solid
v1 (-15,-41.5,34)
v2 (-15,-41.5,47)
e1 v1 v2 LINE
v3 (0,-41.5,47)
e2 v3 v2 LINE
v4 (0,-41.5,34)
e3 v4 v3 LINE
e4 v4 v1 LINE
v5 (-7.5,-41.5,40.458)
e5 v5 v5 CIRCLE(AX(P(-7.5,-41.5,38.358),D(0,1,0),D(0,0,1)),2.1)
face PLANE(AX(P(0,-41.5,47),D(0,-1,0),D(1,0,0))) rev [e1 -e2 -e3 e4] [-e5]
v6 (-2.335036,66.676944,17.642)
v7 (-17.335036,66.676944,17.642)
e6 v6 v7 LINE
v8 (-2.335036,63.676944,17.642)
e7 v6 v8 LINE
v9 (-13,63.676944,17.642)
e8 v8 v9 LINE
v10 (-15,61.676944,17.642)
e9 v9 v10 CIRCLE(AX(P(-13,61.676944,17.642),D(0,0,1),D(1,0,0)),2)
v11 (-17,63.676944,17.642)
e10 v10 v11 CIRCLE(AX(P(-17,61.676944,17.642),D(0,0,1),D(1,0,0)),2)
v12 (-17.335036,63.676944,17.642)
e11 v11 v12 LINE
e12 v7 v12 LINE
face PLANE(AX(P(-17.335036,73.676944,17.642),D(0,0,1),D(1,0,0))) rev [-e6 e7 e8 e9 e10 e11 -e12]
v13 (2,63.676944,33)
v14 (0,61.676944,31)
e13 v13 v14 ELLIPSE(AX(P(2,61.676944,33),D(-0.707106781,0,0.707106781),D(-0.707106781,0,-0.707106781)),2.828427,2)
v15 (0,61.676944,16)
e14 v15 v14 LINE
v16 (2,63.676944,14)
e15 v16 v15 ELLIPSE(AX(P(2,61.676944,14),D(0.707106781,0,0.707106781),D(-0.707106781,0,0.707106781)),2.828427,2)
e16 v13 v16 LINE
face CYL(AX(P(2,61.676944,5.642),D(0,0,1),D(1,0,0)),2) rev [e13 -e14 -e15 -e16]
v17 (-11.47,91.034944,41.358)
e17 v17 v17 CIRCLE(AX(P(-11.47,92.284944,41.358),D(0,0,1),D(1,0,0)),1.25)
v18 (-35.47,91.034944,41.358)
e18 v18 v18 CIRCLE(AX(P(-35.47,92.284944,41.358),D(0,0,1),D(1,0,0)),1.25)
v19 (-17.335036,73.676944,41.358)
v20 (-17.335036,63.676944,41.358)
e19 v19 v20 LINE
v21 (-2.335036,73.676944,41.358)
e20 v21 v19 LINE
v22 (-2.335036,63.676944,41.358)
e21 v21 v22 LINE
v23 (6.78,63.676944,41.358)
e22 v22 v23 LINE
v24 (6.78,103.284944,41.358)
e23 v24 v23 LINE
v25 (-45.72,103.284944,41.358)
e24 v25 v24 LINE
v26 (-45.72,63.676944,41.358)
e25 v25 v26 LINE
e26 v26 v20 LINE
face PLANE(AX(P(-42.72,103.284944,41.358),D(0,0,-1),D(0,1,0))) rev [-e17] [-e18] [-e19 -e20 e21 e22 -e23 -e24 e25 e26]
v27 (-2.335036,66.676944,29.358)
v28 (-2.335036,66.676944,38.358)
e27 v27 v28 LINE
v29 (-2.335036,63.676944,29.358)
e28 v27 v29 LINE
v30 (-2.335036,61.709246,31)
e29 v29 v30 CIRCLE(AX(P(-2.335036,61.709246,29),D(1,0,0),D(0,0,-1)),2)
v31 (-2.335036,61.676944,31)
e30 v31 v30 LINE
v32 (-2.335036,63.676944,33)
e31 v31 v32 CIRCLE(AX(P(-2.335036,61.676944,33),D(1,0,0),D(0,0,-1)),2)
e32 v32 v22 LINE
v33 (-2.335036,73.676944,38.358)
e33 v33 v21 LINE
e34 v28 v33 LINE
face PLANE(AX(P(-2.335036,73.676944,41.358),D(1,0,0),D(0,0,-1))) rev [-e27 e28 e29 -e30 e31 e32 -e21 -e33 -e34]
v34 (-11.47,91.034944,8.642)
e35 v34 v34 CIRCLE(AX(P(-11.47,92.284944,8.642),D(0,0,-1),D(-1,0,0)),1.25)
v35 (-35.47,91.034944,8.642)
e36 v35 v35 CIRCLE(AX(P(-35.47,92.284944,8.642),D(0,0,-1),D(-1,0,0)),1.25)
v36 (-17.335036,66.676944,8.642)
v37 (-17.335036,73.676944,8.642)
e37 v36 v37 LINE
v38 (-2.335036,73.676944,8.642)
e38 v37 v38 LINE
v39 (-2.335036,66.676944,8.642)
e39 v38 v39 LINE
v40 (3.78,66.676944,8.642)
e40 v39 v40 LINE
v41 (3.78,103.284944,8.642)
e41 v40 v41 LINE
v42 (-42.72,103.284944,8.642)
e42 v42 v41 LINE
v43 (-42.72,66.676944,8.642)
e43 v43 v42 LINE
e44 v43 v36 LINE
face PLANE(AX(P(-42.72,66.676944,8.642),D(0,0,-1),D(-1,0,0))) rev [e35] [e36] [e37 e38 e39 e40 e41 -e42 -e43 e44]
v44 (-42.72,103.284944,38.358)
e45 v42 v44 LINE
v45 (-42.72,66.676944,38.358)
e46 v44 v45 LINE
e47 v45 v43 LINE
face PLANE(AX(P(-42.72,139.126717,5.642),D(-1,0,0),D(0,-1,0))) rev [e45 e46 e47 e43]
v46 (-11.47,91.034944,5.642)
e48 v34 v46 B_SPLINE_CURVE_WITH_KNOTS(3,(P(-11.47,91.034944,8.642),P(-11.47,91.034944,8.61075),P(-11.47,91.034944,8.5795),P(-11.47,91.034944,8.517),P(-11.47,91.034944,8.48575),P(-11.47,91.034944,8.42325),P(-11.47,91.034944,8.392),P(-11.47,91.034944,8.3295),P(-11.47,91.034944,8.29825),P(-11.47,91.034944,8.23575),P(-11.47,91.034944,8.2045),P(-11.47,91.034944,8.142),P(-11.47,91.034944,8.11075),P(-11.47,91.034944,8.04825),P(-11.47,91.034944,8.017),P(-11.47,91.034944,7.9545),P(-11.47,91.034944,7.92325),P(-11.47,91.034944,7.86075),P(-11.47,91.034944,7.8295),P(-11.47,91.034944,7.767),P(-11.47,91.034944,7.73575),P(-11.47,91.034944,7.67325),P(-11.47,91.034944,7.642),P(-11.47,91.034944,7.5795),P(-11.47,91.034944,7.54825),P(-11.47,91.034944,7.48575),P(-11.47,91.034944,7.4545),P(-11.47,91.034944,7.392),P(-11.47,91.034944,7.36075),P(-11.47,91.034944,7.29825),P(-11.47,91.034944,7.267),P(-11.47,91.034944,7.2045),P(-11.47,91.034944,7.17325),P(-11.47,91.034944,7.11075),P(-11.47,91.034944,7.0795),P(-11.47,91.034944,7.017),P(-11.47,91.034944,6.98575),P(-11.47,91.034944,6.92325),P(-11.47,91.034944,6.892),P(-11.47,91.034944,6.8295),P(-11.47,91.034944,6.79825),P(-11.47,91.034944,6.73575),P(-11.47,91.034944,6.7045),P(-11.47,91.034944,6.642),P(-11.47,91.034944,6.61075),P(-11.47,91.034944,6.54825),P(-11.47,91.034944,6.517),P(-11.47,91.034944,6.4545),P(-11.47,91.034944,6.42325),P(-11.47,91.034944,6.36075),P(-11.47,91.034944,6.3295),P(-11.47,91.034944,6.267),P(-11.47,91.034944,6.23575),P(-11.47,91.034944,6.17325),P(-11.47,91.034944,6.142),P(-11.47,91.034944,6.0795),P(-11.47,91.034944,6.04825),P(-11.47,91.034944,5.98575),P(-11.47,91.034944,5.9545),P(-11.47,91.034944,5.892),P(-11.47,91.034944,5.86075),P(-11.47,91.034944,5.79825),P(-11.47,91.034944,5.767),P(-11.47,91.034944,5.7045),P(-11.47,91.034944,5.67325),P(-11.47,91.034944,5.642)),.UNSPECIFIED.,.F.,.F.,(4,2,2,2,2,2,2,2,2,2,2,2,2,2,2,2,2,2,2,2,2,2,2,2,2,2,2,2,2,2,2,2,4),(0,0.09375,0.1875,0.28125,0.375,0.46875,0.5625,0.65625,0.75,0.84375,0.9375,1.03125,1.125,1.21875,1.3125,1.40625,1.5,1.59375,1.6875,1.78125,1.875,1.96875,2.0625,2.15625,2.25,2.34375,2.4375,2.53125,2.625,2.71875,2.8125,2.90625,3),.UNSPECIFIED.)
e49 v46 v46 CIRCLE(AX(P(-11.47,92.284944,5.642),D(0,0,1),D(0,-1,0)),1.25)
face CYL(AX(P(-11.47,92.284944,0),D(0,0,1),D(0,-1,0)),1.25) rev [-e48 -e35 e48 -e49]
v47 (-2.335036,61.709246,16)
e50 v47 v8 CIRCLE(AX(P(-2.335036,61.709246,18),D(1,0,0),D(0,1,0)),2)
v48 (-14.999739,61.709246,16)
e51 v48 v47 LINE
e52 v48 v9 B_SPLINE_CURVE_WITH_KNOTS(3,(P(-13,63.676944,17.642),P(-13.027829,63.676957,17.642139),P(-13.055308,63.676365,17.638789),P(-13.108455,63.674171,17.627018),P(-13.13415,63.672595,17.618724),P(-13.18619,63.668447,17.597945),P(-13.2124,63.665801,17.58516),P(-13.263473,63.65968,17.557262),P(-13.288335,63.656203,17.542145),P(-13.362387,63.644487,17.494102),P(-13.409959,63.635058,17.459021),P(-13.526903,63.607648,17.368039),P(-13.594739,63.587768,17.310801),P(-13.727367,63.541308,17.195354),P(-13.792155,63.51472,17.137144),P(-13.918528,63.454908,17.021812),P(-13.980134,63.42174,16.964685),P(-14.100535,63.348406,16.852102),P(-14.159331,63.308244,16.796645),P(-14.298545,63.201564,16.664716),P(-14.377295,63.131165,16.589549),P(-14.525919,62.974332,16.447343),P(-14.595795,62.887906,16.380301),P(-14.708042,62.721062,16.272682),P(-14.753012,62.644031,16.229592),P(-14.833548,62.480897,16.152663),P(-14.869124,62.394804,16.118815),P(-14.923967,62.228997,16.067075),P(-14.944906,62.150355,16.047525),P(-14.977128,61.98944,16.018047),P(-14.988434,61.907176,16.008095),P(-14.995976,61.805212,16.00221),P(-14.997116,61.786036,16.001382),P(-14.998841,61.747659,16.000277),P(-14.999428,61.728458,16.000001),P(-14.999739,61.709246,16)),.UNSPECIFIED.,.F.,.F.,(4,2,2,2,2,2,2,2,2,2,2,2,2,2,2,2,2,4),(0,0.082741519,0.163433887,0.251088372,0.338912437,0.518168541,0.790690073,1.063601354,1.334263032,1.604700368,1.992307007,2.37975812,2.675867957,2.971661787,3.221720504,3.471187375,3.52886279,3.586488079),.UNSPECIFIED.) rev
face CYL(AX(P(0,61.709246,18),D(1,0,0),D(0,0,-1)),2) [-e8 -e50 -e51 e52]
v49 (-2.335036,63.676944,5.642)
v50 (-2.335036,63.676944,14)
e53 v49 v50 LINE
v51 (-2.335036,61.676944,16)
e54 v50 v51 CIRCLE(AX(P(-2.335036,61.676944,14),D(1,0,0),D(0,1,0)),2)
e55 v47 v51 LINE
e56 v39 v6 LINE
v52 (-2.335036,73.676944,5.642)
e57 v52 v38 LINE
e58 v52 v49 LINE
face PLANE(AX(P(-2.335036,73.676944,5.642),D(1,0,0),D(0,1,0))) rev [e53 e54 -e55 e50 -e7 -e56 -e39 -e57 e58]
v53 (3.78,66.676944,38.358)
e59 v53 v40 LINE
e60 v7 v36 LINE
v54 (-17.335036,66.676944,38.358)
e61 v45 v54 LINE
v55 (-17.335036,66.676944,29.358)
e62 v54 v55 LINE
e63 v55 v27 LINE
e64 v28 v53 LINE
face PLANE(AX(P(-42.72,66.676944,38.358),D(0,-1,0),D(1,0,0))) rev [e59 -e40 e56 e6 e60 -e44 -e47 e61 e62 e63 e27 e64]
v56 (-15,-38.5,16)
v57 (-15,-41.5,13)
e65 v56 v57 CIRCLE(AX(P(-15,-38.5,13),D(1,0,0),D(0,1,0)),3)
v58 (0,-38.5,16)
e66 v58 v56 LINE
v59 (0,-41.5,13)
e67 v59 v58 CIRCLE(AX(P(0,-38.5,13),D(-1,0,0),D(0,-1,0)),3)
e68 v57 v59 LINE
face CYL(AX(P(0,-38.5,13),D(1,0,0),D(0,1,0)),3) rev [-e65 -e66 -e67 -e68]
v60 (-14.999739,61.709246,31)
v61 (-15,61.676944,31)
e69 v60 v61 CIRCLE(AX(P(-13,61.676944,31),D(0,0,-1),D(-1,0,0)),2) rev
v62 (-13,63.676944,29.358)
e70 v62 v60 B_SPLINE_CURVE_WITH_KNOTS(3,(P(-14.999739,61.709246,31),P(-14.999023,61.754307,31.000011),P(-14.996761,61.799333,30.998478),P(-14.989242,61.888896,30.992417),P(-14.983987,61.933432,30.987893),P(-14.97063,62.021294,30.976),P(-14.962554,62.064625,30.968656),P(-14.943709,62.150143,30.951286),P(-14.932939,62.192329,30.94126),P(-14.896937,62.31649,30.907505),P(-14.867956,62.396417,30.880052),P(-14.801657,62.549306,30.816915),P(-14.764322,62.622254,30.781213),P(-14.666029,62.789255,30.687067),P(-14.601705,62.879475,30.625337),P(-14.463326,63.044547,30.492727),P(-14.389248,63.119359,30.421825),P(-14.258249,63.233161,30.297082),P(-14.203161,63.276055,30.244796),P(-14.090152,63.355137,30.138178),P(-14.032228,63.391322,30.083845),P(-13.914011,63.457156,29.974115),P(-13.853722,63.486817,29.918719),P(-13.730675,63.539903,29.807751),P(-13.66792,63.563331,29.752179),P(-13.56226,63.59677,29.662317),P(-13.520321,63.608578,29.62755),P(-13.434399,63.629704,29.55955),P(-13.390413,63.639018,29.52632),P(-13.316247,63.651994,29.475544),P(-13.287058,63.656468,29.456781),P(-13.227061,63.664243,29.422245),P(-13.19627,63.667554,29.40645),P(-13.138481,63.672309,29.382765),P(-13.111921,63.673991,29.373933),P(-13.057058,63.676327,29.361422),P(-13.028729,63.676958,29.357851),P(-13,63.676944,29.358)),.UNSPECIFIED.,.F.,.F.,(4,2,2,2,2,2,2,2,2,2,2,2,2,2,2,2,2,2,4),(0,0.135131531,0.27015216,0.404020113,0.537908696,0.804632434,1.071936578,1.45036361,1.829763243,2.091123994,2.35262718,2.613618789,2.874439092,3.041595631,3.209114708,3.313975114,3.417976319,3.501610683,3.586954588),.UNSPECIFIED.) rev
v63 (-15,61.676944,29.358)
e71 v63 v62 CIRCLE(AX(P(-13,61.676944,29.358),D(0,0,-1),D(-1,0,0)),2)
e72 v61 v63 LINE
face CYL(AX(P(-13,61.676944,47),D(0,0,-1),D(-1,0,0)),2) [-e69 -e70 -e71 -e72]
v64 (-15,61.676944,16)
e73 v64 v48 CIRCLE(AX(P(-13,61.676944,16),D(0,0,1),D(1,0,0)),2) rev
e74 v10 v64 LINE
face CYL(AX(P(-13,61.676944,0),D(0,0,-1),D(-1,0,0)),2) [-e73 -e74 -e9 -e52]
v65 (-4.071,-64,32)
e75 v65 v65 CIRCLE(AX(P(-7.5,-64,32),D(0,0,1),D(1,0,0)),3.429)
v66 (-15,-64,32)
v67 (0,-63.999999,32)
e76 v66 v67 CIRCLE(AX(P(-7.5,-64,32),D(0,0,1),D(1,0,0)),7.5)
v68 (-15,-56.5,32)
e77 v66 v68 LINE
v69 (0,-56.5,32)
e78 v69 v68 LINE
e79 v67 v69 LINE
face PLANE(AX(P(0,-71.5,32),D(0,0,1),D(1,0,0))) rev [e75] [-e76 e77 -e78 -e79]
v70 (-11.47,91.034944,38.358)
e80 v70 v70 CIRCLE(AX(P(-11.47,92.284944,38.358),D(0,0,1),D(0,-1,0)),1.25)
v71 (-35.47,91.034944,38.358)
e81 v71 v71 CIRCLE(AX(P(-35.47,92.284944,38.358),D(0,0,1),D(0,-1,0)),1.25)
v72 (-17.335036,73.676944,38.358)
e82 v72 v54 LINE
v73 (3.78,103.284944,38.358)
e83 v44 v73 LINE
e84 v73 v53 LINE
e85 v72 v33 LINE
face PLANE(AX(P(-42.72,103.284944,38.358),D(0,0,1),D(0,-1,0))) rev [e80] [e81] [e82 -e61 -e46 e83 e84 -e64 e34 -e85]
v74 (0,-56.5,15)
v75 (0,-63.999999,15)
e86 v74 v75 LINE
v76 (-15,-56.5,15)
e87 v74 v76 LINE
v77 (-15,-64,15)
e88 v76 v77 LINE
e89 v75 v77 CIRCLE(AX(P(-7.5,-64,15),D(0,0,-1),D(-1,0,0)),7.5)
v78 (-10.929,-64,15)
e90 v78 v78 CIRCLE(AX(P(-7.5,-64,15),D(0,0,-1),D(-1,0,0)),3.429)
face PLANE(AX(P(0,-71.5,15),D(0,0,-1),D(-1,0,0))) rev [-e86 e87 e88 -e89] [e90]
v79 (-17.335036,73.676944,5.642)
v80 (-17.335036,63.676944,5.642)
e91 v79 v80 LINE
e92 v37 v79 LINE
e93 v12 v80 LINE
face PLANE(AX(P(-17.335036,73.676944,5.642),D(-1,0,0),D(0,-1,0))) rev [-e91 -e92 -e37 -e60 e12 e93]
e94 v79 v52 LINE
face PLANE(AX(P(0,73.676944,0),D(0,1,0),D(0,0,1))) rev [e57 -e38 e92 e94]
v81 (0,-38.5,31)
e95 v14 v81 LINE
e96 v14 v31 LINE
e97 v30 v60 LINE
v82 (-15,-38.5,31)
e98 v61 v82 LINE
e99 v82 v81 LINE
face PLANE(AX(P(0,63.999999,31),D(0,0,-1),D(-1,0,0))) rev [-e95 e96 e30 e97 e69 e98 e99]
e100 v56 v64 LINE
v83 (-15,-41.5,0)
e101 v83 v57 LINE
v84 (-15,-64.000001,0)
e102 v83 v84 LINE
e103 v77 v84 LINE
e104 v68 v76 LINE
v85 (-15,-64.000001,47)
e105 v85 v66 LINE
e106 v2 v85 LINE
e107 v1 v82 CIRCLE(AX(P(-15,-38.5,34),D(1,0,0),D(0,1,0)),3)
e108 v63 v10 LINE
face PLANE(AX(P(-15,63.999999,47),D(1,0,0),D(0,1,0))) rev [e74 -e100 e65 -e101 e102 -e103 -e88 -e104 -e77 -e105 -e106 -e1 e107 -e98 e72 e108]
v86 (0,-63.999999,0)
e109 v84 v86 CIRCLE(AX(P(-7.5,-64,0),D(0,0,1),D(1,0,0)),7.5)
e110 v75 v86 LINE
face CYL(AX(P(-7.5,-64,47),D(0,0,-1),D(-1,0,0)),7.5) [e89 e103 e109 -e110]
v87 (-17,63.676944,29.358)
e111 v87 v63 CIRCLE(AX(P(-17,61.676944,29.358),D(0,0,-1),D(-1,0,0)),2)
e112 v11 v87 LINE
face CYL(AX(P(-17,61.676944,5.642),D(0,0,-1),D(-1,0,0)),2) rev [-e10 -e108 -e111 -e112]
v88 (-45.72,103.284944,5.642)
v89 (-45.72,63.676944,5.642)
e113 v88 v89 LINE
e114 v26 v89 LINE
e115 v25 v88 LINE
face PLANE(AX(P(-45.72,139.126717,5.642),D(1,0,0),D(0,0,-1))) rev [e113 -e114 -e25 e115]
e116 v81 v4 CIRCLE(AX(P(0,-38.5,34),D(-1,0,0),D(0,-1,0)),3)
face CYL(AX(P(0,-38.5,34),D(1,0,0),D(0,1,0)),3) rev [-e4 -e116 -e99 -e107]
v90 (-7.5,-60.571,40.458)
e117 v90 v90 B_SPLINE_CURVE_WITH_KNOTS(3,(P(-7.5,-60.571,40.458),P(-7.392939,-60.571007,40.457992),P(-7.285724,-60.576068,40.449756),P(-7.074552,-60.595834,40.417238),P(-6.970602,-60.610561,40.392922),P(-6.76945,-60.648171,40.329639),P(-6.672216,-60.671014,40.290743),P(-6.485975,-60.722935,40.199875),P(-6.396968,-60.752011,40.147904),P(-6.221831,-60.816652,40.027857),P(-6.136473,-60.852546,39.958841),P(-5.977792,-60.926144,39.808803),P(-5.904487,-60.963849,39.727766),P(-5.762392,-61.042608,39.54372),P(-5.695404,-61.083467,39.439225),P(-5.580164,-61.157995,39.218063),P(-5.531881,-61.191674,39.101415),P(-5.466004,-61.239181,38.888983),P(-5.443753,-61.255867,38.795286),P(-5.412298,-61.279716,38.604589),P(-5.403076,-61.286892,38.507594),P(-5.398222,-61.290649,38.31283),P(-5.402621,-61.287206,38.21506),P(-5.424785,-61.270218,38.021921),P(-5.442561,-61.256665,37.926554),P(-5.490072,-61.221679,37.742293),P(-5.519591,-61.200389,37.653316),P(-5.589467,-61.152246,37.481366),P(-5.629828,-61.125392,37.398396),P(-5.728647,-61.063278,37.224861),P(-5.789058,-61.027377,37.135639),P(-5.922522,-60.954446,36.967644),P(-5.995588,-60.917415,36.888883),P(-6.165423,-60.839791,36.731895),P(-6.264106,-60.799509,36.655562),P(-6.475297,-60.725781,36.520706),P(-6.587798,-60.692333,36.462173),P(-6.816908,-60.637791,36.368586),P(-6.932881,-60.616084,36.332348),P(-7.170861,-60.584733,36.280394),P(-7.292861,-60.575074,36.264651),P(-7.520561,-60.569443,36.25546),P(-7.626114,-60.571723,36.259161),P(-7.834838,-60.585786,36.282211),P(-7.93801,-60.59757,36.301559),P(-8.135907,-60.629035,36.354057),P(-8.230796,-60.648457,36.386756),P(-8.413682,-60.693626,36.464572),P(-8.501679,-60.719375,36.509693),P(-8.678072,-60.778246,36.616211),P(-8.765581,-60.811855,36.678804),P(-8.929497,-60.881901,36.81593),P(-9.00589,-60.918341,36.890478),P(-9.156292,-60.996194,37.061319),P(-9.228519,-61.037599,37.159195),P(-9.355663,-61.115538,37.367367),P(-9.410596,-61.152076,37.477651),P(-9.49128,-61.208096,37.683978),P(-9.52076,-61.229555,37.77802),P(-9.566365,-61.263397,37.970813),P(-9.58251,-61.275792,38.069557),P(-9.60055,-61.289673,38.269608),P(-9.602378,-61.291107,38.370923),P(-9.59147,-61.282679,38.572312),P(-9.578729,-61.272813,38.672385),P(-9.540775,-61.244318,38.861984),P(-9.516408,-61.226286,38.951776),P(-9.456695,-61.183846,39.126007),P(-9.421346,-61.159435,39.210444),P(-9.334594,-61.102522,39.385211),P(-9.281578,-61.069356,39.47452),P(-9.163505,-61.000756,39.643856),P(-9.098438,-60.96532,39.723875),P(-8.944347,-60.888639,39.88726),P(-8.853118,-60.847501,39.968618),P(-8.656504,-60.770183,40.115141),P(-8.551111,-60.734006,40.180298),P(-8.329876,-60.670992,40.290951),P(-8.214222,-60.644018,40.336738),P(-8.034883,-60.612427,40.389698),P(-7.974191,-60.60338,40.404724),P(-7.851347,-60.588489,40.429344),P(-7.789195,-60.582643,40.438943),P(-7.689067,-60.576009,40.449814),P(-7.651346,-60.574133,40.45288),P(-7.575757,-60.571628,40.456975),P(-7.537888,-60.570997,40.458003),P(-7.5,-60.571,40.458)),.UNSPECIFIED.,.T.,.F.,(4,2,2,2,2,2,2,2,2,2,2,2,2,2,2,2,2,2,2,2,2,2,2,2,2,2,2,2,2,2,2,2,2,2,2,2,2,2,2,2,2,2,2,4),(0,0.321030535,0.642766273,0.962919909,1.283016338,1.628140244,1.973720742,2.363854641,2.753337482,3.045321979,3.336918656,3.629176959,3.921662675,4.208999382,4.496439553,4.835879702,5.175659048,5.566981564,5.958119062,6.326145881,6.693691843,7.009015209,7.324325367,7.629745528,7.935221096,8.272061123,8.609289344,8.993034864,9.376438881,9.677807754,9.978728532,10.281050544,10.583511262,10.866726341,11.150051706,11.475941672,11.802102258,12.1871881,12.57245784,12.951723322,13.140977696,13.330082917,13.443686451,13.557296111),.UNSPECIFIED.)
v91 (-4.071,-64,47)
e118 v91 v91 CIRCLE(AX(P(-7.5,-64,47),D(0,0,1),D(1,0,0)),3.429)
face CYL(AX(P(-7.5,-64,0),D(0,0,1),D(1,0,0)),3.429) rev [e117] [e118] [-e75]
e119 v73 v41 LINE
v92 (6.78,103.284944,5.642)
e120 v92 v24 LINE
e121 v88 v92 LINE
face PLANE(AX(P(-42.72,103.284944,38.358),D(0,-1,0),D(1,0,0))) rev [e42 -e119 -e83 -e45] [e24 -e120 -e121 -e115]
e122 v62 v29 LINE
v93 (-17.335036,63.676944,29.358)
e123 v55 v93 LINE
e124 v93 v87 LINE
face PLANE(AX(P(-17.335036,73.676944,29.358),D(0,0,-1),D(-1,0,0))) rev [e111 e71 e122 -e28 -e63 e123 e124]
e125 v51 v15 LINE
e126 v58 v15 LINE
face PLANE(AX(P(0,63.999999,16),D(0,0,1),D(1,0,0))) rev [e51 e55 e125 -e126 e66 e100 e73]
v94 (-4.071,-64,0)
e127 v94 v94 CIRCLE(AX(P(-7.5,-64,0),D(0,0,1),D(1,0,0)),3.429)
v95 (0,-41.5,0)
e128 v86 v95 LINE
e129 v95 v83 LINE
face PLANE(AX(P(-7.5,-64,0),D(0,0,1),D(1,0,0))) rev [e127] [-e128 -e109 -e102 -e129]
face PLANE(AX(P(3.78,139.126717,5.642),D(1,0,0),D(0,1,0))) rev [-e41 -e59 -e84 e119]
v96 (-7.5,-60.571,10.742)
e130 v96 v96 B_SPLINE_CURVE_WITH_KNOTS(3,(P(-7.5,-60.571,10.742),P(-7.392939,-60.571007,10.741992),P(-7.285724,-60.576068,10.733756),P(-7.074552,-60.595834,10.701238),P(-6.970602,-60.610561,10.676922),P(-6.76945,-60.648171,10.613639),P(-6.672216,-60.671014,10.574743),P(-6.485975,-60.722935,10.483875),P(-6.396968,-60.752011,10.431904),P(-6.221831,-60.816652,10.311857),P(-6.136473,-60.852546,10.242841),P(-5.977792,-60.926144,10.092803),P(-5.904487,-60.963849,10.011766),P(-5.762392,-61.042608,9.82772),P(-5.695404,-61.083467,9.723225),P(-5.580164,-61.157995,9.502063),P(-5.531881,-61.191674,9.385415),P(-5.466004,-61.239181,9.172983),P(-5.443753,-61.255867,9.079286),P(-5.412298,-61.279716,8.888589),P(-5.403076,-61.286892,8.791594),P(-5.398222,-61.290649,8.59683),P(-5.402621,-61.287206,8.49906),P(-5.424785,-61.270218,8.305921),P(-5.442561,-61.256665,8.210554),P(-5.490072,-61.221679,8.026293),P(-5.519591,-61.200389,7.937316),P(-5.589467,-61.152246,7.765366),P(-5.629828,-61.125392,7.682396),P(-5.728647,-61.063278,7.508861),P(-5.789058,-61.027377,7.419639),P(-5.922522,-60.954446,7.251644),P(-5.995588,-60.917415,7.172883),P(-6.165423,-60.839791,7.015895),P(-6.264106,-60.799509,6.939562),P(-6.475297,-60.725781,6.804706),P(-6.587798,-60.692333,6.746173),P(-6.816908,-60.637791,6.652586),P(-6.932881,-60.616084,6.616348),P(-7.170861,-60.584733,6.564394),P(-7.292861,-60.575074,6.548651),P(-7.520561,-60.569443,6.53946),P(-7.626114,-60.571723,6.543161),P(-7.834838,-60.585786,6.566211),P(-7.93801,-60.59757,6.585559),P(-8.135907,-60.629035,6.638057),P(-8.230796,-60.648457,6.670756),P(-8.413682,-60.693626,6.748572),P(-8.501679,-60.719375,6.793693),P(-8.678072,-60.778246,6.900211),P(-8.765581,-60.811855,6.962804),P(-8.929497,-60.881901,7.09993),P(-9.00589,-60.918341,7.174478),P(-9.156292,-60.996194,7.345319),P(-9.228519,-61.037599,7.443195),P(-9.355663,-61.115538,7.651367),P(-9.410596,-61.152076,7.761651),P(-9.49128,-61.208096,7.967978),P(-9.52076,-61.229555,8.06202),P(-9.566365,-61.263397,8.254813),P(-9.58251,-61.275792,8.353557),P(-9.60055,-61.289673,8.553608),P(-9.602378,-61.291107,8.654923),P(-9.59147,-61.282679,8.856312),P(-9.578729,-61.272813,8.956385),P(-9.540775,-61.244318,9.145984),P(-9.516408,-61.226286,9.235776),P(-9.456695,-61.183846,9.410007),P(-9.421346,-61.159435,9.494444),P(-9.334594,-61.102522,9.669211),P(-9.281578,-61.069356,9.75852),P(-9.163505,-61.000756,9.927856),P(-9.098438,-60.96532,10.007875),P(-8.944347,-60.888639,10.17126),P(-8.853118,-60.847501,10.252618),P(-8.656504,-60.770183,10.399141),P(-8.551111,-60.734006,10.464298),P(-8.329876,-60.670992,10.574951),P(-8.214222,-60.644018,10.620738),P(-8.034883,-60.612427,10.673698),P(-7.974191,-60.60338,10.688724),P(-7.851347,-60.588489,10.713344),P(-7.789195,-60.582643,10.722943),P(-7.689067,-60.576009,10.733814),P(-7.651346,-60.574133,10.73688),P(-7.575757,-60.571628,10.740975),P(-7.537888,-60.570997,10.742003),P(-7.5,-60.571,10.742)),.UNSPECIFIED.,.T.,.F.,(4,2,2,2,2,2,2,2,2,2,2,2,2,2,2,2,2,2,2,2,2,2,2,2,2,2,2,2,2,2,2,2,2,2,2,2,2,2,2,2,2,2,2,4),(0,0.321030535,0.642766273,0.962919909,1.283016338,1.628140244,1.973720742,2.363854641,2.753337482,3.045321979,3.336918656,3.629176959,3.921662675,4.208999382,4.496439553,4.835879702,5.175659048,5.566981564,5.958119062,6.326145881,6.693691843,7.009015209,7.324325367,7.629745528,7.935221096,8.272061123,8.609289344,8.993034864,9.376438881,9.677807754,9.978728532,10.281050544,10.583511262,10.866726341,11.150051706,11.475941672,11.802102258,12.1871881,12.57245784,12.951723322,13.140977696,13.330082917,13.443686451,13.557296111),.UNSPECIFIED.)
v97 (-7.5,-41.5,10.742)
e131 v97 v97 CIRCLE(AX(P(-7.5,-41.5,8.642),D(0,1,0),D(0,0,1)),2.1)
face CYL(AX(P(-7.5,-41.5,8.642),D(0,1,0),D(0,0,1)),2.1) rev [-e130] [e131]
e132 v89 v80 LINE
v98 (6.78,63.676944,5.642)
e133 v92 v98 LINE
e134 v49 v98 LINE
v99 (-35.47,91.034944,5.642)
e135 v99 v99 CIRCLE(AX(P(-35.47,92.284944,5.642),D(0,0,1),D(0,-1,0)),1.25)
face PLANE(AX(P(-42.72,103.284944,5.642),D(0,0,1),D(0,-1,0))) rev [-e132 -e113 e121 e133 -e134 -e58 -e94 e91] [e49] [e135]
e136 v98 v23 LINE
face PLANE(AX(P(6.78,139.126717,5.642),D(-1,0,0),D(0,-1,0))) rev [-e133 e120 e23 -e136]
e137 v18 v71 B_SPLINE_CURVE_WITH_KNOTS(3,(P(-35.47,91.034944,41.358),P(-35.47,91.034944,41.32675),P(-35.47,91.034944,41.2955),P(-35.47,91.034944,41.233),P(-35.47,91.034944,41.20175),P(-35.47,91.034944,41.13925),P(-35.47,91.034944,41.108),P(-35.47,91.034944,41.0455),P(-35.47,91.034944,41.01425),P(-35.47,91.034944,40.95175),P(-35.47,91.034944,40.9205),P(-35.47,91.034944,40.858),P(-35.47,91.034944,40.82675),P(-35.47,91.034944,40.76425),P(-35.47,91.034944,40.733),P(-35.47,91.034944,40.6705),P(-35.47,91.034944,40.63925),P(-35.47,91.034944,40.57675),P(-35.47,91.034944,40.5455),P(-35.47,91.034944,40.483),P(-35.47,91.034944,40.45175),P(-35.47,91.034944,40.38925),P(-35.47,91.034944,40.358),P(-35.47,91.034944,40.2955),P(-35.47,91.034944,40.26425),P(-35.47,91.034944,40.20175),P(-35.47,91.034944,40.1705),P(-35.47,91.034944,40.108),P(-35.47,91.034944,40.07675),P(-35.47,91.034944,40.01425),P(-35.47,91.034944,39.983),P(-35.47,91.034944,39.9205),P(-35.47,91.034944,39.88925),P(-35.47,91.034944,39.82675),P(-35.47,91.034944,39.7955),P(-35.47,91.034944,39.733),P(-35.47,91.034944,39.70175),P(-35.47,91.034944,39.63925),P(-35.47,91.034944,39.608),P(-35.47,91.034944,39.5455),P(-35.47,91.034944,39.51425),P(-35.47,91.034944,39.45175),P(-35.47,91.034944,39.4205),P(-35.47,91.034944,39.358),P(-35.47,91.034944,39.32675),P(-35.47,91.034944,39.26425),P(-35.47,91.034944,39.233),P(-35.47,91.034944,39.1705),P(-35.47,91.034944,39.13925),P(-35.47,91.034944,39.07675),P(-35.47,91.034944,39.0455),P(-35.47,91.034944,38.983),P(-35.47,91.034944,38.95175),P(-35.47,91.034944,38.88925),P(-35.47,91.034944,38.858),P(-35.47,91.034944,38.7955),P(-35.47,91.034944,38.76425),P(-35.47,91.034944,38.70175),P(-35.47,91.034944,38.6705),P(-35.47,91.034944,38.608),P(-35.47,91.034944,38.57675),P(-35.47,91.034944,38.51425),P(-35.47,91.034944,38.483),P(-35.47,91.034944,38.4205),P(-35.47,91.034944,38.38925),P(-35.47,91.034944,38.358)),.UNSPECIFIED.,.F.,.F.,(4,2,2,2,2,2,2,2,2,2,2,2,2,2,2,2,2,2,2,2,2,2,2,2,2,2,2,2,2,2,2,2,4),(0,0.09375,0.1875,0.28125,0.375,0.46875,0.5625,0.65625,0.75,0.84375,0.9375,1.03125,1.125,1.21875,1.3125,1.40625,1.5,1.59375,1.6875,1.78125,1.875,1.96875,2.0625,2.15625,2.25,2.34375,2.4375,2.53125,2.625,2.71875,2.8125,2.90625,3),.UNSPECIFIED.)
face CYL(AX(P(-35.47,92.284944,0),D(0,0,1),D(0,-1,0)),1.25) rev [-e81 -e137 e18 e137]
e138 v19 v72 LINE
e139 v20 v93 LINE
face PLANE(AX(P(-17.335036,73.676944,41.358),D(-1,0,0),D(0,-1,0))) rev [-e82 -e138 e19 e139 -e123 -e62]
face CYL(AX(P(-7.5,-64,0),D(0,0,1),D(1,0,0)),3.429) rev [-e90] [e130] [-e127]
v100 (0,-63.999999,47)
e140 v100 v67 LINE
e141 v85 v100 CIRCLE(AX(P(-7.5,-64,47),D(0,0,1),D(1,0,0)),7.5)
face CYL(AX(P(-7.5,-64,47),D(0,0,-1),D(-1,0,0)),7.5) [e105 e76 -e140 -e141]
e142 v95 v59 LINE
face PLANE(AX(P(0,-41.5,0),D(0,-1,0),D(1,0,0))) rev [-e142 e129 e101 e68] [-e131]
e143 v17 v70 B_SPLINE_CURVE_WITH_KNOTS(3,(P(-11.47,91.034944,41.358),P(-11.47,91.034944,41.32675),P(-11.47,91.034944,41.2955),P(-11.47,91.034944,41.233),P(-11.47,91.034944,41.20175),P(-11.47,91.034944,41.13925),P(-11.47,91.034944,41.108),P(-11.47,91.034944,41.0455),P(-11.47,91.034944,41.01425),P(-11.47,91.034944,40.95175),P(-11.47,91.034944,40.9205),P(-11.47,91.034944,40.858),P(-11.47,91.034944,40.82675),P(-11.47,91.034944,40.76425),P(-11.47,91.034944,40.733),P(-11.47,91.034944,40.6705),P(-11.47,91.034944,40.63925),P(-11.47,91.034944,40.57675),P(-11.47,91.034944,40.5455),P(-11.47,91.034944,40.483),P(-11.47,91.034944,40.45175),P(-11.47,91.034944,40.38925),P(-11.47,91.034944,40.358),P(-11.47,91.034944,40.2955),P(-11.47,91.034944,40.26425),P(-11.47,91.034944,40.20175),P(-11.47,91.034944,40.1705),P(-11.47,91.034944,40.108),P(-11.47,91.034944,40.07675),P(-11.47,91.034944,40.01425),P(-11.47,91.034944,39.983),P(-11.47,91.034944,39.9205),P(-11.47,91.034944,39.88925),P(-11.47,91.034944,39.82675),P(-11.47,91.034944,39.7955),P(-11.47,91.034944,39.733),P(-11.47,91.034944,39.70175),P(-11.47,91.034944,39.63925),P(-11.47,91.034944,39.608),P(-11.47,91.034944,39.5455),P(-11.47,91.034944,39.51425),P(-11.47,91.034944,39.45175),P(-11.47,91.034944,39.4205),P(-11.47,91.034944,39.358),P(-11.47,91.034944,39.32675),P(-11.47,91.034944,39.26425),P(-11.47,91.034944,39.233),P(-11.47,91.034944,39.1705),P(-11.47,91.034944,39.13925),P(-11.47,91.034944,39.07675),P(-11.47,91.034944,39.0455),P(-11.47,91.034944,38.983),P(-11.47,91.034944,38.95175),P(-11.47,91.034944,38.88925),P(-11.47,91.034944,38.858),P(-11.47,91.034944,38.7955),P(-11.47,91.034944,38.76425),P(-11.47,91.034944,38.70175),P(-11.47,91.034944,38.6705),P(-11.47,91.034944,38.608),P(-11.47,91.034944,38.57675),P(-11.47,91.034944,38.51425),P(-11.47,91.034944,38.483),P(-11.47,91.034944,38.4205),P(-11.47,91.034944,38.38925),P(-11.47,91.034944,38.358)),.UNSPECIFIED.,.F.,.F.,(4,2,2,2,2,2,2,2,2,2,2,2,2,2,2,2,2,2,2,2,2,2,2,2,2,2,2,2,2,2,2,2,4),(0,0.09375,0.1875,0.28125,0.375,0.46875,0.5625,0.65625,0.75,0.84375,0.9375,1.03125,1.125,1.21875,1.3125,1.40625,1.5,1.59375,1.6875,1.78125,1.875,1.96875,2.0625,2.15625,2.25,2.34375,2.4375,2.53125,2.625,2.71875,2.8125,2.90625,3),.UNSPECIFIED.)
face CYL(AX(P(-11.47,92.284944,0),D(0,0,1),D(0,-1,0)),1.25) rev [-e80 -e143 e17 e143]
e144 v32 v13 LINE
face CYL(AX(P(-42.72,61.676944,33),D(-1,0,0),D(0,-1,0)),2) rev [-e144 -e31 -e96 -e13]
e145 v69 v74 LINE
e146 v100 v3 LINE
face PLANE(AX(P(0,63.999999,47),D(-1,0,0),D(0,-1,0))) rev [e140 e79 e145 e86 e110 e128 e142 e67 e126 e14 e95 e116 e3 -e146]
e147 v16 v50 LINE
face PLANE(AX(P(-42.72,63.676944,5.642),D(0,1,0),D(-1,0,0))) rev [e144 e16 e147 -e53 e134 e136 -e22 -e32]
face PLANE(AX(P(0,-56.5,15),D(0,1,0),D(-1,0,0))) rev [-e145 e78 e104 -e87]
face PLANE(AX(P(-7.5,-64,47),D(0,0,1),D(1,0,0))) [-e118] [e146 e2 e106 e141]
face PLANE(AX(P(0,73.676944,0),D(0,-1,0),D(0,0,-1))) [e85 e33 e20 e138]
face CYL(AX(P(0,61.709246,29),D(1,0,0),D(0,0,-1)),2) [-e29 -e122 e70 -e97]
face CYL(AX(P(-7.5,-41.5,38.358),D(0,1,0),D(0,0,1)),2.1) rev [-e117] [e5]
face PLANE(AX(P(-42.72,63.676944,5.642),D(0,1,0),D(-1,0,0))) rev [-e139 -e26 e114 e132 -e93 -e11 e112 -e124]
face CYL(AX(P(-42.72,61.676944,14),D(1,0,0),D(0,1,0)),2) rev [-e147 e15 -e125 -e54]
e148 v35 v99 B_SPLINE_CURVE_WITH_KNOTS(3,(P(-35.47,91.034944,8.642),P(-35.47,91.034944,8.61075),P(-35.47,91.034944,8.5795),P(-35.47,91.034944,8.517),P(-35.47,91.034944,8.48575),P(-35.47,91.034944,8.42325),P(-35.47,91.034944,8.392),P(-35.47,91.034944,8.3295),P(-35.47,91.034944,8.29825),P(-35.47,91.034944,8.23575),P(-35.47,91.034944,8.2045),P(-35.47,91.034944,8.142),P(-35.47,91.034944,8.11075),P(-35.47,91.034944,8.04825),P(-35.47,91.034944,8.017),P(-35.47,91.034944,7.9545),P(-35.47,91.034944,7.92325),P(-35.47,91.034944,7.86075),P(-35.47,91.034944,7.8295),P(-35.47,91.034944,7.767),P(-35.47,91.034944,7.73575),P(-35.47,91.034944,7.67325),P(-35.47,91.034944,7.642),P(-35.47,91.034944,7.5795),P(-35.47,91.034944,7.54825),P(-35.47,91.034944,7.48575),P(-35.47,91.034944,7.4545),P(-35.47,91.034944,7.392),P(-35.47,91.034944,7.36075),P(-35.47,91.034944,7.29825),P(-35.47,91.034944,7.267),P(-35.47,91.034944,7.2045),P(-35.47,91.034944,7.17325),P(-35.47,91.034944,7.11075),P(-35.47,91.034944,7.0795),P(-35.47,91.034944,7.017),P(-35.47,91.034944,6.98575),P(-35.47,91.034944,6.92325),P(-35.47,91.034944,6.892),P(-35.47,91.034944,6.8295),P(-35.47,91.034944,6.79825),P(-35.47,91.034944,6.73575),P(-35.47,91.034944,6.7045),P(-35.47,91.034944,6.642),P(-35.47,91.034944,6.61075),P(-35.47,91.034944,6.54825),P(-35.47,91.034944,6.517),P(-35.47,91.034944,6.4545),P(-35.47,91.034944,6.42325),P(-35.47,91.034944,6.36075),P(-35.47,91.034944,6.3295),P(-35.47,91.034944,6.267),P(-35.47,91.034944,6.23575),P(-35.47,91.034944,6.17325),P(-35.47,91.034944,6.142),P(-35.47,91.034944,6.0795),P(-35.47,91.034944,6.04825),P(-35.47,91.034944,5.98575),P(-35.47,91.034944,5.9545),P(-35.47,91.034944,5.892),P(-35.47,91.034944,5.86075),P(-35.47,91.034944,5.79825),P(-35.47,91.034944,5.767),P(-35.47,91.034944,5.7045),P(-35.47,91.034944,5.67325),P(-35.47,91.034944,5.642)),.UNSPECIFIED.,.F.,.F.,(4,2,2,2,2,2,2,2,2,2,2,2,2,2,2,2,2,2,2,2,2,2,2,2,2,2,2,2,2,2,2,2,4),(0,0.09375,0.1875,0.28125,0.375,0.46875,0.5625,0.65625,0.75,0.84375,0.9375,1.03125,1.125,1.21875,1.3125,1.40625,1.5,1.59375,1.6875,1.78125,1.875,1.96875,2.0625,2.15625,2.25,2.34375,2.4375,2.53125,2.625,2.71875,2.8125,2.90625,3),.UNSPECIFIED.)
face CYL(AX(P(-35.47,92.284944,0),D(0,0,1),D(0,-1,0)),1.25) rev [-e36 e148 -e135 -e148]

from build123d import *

# Parameters (mm, degrees)
BOSS_EXTRU_1_DEPTH                            = 47
ESQUISSE2_W                                   = 17
ESQUISSE2_H                                   = 14.999999999999986
ENL_V_MAT_EXTRU_1_DEPTH                       = 87.8691544795966
BOSS_EXTRU_2_DEPTH                            = 27.72
BOSS_EXTRU_2_DEPTH_BACK                       = 18.78
BOSS_EXTRU_5_REACH                            = 154.075
BOSS_EXTRU_5_DIRECTION_2_REACH                = 154.075
ESQUISSE5_R                                   = 1.2499999999999978
ENL_V_MAT_EXTRU_2_DEPTH                       = 121.28542019885793
ESQUISSE6_W                                   = 15.000000000000004
ESQUISSE6_H                                   = 11.999999999999996
ENL_V_MAT_EXTRU_3_DEPTH                       = 10
CONG_1_R                                      = 2
CONG_2_R                                      = 3
ESQUISSE9_R                                   = 3.4290000000000016
ENL_V_MAT_EXTRU_4_DEPTH                       = 123.34009215468092
TROU_POUR_TARAUDAGE_POUR_TROU_TARAUD_M5_REACH = 160.94
TROU_POUR_TARAUDAGE_POUR_TROU_TARAUD_2_R      = 2.1
CONG_3_R                                      = 2


with BuildPart() as part:
    # Esquisse1 → Boss.-Extru.1 (new body)
    with BuildSketch(Plane.XY):
        with BuildLine():
            Line((-15, 63.999998751364224), (0, 63.999998751364224))
            Line((0, 63.999998751364224), (-4.3e-16, -63.999998751364224))
            ThreePointArc((-4.3e-16, -63.999998751364224), (-7.499998751364213, -71.5), (-14.999999999999986, -64.00000124863578))
            Line((-14.999999999999986, -64.00000124863578), (-15, 63.999998751364224))
        make_face()
    extrude(amount=BOSS_EXTRU_1_DEPTH)

    # Esquisse2 → Enlèv. mat.-Extru.1 (cut, through all)
    with BuildSketch(Plane.ZY.offset(14.999999999999993)):
        with Locations((23.5, -64.00000000000009)):
            Rectangle(ESQUISSE2_W, ESQUISSE2_H)
        Polygon((47, 63.999998751364224), (31, 63.999998751364224), (31, -41.50000000000009), (47.000000000000014, -41.50000000000009), align=None)
        Polygon((0, 63.999998751364224), (16, 63.999998751364224), (16, -41.5000000000001), (1.292e-14, -41.5000000000001), align=None)
    extrude(amount=-ENL_V_MAT_EXTRU_1_DEPTH, mode=Mode.SUBTRACT)

    # Esquisse3 → Boss.-Extru.2 (add, two sides: drawn at the far end of the back side and taken through both)
    with BuildSketch(Plane.ZY.offset(14.999999999999993).offset(-BOSS_EXTRU_2_DEPTH_BACK)):
        Polygon((38.358000000000004, 103.28494444213939), (38.35800000000001, 66.67694444213939), (8.642, 66.67694444213939), (8.642, 103.28494444213939), (5.641999999999999, 103.28494444213939), (5.642000000000004, 63.676944442139366), (41.35800000000001, 63.676944442139366), (41.358000000000004, 103.28494444213939), align=None)
    extrude(amount=BOSS_EXTRU_2_DEPTH + BOSS_EXTRU_2_DEPTH_BACK)

    # Boss.-Extru.5: up to this face of the body (flat: up to its plane)
    boss_extru_5_end = Plane(part.part.faces().sort_by_distance((-19.47, 103.284944442, 7.142))[0])
    # Esquisse4 → Boss.-Extru.5 (add, up to the picked face)
    with BuildSketch(Plane(origin=(-7.29e-15, 66.67694444213939, 0), x_dir=(1, 1.1e-16, 0), z_dir=(-1.1e-16, 1, 0)), mode=Mode.PRIVATE) as boss_extru_5_sk1:
        Polygon((3.780000000000016, -5.641999999999999), (6.780000000000015, -5.641999999999999), (6.780000000000019, -41.358000000000004), (3.780000000000016, -41.358000000000004), align=None)
    boss_extru_5_tool1 = split(extrude(boss_extru_5_sk1.sketch, amount=BOSS_EXTRU_5_REACH, mode=Mode.PRIVATE), bisect_by=boss_extru_5_end, keep=Keep.BOTH, mode=Mode.PRIVATE)
    # Esquisse4 → Boss.-Extru.5 (add, up to the picked face)
    with BuildSketch(Plane(origin=(-7.29e-15, 66.67694444213939, 0), x_dir=(1, 1.1e-16, 0), z_dir=(-1.1e-16, 1, 0)), mode=Mode.PRIVATE) as boss_extru_5_sk2:
        Polygon((-42.719999999999985, -5.641999999999999), (-45.71999999999999, -5.641999999999999), (-45.719999999999985, -41.358000000000004), (-42.719999999999985, -41.358000000000004), align=None)
    boss_extru_5_tool2 = split(extrude(boss_extru_5_sk2.sketch, amount=BOSS_EXTRU_5_REACH, mode=Mode.PRIVATE), bisect_by=boss_extru_5_end, keep=Keep.BOTH, mode=Mode.PRIVATE)
    add(boss_extru_5_tool1.solids().sort_by(Axis((5.28, 66.676944, 23.5), (-1.1e-16, 1, 0)))[0])
    add(boss_extru_5_tool2.solids().sort_by(Axis((-44.22, 66.676944, 23.5), (-1.1e-16, 1, 0)))[0])

    # Boss.-Extru.5 direction 2: up to this face of the body (flat: up to its plane)
    boss_extru_5_direction_2_end = Plane(part.part.faces().sort_by_distance((-21.345791374, 63.676944442, 23.5))[0])
    # Esquisse4 → Boss.-Extru.5 direction 2 (add, up to the picked face)
    with BuildSketch(Plane(origin=(-7.29e-15, 66.67694444213939, 0), x_dir=(1, 1.1e-16, 0), z_dir=(-1.1e-16, 1, 0)), mode=Mode.PRIVATE) as boss_extru_5_direction_2_sk1:
        Polygon((3.780000000000016, -5.641999999999999), (6.780000000000015, -5.641999999999999), (6.780000000000019, -41.358000000000004), (3.780000000000016, -41.358000000000004), align=None)
    boss_extru_5_direction_2_tool1 = split(extrude(boss_extru_5_direction_2_sk1.sketch, amount=-BOSS_EXTRU_5_DIRECTION_2_REACH, mode=Mode.PRIVATE), bisect_by=boss_extru_5_direction_2_end, keep=Keep.BOTH, mode=Mode.PRIVATE)
    # Esquisse4 → Boss.-Extru.5 direction 2 (add, up to the picked face)
    with BuildSketch(Plane(origin=(-7.29e-15, 66.67694444213939, 0), x_dir=(1, 1.1e-16, 0), z_dir=(-1.1e-16, 1, 0)), mode=Mode.PRIVATE) as boss_extru_5_direction_2_sk2:
        Polygon((-42.719999999999985, -5.641999999999999), (-45.71999999999999, -5.641999999999999), (-45.719999999999985, -41.358000000000004), (-42.719999999999985, -41.358000000000004), align=None)
    boss_extru_5_direction_2_tool2 = split(extrude(boss_extru_5_direction_2_sk2.sketch, amount=-BOSS_EXTRU_5_DIRECTION_2_REACH, mode=Mode.PRIVATE), bisect_by=boss_extru_5_direction_2_end, keep=Keep.BOTH, mode=Mode.PRIVATE)
    add(boss_extru_5_direction_2_tool1.solids().sort_by(Axis((5.28, 66.676944, 23.5), (1.1e-16, -1, 0)))[0])
    add(boss_extru_5_direction_2_tool2.solids().sort_by(Axis((-44.22, 66.676944, 23.5), (1.1e-16, -1, 0)))[0])

    # Esquisse5 → Enlèv. mat.-Extru.2 (cut, through all)
    with BuildSketch(Plane.XY.offset(41.358000000000025)):
        with Locations(Location((-11.469999999999994, 92.28494444213936, 0), (0, 0, 270))):
            Circle(ESQUISSE5_R)
        with Locations(Location((-35.47, 92.28494444213936, 0), (0, 0, 270))):
            Circle(ESQUISSE5_R)
    extrude(amount=-ENL_V_MAT_EXTRU_2_DEPTH, mode=Mode.SUBTRACT)

    # Esquisse6 → Enlèv. mat.-Extru.3 (cut)
    with BuildSketch(Plane.XZ.offset(-63.676944442139366)):
        Polygon((-17.335036050217354, 41.35800000000002), (-2.335036050217353, 41.35800000000002), (-2.3350360502173517, 29.35800000000002), (-17.335036050217354, 29.35800000000002), align=None)
        with Locations((-9.835036050217353, 11.642000000000012)):
            Rectangle(ESQUISSE6_W, ESQUISSE6_H)
    extrude(amount=-ENL_V_MAT_EXTRU_3_DEPTH, mode=Mode.SUBTRACT)

    # Congé1
    cong_1_edges = [part.edges().sort_by_distance(p)[0] for p in [
        (-15, 63.67694444213936, 23.500000000000014),
        (-1.167518025108679, 63.676944442139366, 31),
        (0, 63.676944442139366, 23.5),
        (-1.167518025108679, 63.676944442139366, 16),
    ]]
    fillet(cong_1_edges, radius=CONG_1_R)

    # Congé2
    cong_2_edges = [part.edges().sort_by_distance(p)[0] for p in [
        (-7.499999999999994, -41.50000000000009, 31),
        (-7.499999999999994, -41.5000000000001, 16),
    ]]
    fillet(cong_2_edges, radius=CONG_2_R)

    # Esquisse9 → Enlèv. mat.-Extru.4 (cut, through all)
    with BuildSketch(Plane.XY.offset(47)):
        with Locations((-7.499999999999992, -64)):
            Circle(ESQUISSE9_R)
    extrude(amount=-ENL_V_MAT_EXTRU_4_DEPTH, mode=Mode.SUBTRACT)

    # Trou pour taraudage pour trou taraud 2 → Trou pour taraudage pour trou taraudé M52 (cut, up to next)
    with BuildSketch(Plane(origin=(4.53e-15, -41.5000000000001, 0), x_dir=(1, 1.1e-16, 0), z_dir=(-1.1e-16, 1, 0)), mode=Mode.PRIVATE) as trou_pour_taraudage_pour_trou_taraud_m5_sk1:
        with Locations((-7.5, -8.642)):
            Circle(TROU_POUR_TARAUDAGE_POUR_TROU_TARAUD_2_R)
    trou_pour_taraudage_pour_trou_taraud_m5_tool1 = extrude(trou_pour_taraudage_pour_trou_taraud_m5_sk1.sketch, amount=-TROU_POUR_TARAUDAGE_POUR_TROU_TARAUD_M5_REACH, mode=Mode.PRIVATE) & part.part
    # Trou pour taraudage pour trou taraud 2 → Trou pour taraudage pour trou taraudé M52 (cut, up to next)
    with BuildSketch(Plane(origin=(4.53e-15, -41.5000000000001, 0), x_dir=(1, 1.1e-16, 0), z_dir=(-1.1e-16, 1, 0)), mode=Mode.PRIVATE) as trou_pour_taraudage_pour_trou_taraud_m5_sk2:
        with Locations((-7.5, -38.358)):
            Circle(TROU_POUR_TARAUDAGE_POUR_TROU_TARAUD_2_R)
    trou_pour_taraudage_pour_trou_taraud_m5_tool2 = extrude(trou_pour_taraudage_pour_trou_taraud_m5_sk2.sketch, amount=-TROU_POUR_TARAUDAGE_POUR_TROU_TARAUD_M5_REACH, mode=Mode.PRIVATE) & part.part
    add(trou_pour_taraudage_pour_trou_taraud_m5_tool1.solids().sort_by_distance((-7.5, -41.5, 8.642))[0], mode=Mode.SUBTRACT)
    add(trou_pour_taraudage_pour_trou_taraud_m5_tool2.solids().sort_by_distance((-7.5, -41.5, 38.358))[0], mode=Mode.SUBTRACT)

    # Congé3
    # the kernel refuses this fillet: 2 mm, written as the material it takes off along each edge
    with BuildSketch(Plane(origin=(-19.919245368957963, 63.676944442139366, 16), x_dir=(1.1e-16, -1, 0), z_dir=(1, 1.1e-16, 0))) as cong_3_piece_1:
        with BuildLine():
            CenterArc((1.9676981475831852, -2), CONG_3_R, 90, 79.68848194075031)
            Line((5.6133e-13, -1.6420000000001131), (0, 0))
            Line((0, 0), (1.9676981475831852, 0))
        make_face()
    extrude(amount=17.584209318740605, mode=Mode.SUBTRACT)
    with BuildSketch(Plane(origin=(-15, 63.67694444213936, 17.64200000000001), x_dir=(0, -1, 0), z_dir=(0, 0, -1))) as cong_3_piece_2:
        with BuildLine():
            CenterArc((CONG_3_R, -CONG_3_R), CONG_3_R, 90, 90)
            Line((0, -CONG_3_R), (0, 0))
            Line((0, 0), (CONG_3_R, 0))
        make_face()
    extrude(amount=6.64200000000001, mode=Mode.SUBTRACT)
    with BuildSketch(Plane(origin=(-19.919245368957963, 63.676944442139366, 31), x_dir=(1.1e-16, -1, 0), z_dir=(1, 1.1e-16, 0))) as cong_3_piece_3:
        with BuildLine():
            CenterArc((1.967698147583178, 2), CONG_3_R, 190.31151805925052, 79.68848194074951)
            Line((5.6133e-13, 1.6420000000000847), (0, 0))
            Line((0, 0), (1.967698147583178, 0))
        make_face()
    extrude(amount=17.584209318740605, mode=Mode.SUBTRACT)
    with BuildSketch(Plane(origin=(-15, 63.67694444213936, 36.00000000000001), x_dir=(0, -1, 0), z_dir=(0, 0, -1))) as cong_3_piece_4:
        with BuildLine():
            CenterArc((CONG_3_R, -CONG_3_R), CONG_3_R, 90, 90)
            Line((0, -CONG_3_R), (0, 0))
            Line((0, 0), (CONG_3_R, 0))
        make_face()
    extrude(amount=6.641999999999989, mode=Mode.SUBTRACT)


solid = part.part
